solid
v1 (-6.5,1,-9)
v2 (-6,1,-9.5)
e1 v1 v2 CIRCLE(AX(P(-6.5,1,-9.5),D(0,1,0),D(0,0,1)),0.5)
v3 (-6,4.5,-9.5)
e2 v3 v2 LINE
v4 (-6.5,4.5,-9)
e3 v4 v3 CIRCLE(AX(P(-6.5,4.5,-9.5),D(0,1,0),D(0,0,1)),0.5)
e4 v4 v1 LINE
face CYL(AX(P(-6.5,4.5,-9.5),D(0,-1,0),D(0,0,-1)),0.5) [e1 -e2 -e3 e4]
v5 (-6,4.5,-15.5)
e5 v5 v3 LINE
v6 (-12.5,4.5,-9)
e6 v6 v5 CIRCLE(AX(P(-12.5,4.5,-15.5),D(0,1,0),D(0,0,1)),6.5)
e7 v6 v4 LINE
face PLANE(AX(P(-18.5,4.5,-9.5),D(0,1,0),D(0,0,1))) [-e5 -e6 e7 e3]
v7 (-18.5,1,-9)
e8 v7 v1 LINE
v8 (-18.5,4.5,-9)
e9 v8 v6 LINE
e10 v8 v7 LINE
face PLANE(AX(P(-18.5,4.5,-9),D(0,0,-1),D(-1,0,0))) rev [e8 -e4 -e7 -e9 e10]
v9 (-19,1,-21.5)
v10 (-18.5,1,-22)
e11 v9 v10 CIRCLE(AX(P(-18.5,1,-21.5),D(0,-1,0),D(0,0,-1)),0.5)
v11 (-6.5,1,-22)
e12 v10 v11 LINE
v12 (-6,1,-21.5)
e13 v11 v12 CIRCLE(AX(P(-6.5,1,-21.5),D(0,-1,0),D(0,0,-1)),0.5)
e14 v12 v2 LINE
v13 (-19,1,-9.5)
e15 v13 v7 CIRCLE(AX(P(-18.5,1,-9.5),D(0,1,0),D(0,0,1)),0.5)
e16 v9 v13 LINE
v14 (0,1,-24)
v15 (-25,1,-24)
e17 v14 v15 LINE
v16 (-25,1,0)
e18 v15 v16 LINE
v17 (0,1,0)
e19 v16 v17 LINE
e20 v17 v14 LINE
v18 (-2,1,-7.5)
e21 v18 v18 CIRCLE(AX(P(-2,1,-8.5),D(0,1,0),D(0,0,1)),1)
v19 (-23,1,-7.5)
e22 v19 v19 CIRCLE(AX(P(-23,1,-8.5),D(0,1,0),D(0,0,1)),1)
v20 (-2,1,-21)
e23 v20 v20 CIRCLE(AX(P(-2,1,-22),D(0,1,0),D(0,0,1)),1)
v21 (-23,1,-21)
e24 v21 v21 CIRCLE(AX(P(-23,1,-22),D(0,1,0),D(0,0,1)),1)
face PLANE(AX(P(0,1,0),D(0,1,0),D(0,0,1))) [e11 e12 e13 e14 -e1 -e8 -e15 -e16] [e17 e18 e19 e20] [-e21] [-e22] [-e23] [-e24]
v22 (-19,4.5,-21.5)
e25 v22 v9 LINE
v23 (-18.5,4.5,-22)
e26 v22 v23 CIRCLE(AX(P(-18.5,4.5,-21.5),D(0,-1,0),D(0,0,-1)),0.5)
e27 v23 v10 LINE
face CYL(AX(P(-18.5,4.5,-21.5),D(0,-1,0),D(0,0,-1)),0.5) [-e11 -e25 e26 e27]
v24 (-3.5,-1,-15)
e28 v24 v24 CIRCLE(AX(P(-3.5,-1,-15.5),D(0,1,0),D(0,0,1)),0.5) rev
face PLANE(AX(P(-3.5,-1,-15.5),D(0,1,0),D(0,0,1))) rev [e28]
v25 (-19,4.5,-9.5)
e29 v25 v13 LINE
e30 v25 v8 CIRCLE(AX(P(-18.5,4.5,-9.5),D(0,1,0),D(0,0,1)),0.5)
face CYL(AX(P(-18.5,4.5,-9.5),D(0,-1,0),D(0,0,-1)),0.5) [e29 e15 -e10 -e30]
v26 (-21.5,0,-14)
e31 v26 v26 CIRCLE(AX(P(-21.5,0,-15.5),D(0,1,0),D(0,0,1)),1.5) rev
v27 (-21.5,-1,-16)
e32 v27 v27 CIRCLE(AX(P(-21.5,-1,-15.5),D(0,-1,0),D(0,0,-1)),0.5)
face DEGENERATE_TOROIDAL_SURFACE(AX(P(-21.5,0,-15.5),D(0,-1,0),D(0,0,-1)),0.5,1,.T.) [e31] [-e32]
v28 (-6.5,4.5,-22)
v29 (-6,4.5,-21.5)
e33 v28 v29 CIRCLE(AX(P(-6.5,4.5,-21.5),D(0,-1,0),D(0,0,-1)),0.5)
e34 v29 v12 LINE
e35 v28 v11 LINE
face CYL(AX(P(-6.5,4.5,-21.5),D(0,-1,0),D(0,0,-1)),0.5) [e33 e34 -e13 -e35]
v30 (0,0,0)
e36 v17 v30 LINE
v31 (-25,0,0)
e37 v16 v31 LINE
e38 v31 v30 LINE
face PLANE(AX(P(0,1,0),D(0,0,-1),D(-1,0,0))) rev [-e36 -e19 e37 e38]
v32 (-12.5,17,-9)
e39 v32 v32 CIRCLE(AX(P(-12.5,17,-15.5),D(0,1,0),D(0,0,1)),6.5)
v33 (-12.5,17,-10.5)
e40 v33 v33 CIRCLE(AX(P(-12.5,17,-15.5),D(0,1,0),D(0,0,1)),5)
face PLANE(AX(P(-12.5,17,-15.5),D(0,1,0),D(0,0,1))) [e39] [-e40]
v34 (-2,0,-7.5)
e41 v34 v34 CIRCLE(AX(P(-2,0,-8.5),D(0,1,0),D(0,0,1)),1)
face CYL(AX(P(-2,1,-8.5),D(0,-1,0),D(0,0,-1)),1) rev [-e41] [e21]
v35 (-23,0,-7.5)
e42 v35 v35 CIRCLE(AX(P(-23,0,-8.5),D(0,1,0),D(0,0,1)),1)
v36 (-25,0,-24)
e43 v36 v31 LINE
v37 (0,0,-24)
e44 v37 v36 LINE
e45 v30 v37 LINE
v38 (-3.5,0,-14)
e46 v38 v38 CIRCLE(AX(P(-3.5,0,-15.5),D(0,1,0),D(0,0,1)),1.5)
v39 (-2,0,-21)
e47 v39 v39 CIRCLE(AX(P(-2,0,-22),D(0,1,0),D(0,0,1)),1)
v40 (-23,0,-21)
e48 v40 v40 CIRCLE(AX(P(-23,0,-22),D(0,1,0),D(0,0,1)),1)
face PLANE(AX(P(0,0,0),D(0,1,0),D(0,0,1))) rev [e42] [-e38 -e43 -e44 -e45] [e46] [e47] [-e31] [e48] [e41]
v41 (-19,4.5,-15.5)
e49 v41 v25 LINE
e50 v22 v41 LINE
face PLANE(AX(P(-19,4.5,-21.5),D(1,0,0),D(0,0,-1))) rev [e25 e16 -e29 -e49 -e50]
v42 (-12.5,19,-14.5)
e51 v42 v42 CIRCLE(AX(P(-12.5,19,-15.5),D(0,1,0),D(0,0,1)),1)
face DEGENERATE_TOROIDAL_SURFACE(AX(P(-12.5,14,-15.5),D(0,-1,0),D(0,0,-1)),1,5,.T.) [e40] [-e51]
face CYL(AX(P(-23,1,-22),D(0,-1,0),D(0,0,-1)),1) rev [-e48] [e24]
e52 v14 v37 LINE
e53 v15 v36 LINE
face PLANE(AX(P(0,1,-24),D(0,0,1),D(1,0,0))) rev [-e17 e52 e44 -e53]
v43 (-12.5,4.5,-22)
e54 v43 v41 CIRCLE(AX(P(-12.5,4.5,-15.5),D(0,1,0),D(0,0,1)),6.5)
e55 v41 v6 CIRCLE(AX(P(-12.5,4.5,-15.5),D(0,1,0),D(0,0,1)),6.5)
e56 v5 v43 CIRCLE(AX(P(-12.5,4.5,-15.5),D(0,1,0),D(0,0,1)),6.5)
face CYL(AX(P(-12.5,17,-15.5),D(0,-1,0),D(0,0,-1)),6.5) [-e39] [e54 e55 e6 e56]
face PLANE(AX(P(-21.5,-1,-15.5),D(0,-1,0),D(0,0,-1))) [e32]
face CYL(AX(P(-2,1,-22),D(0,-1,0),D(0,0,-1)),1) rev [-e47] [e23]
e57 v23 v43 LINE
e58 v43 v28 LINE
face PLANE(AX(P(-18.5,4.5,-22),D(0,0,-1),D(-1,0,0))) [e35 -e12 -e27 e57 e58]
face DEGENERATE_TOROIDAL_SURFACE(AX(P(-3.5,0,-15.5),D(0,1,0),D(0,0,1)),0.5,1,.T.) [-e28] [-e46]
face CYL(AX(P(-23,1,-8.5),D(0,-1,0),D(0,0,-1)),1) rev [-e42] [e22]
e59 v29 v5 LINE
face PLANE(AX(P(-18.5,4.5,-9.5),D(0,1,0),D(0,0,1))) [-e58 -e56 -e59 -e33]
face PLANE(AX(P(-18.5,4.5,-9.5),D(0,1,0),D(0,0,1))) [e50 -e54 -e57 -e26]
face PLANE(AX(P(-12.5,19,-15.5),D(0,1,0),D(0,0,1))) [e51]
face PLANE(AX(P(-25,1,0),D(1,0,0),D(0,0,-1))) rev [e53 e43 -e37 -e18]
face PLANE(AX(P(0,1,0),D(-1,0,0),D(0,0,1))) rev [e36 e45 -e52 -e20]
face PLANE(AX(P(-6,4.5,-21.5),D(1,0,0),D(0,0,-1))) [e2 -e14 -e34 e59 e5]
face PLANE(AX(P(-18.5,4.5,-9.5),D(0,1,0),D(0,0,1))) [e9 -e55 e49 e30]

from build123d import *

# Parameters (mm, degrees)
SKETCH_1_W      = 25
SKETCH_1_H      = 24
SKETCH_1_R      = 1
EXTRUDE_1_DEPTH = 1
SKETCH_3_R      = 6.5
EXTRUDE_4_DEPTH = 16
EXTRUDE_5_DEPTH = 3.5
SKETCH_5_R      = 5
EXTRUDE_6_DEPTH = 2
FILLET_1_R      = 5
SKETCH_10_R     = 1.5
EXTRUDE_7_DEPTH = 1
FILLET_2_R      = 1


# Some blends are built 0.0001 mm under size
with BuildPart() as part:
    # Эскиз1 → Бобышка-Вытянуть1 (new body)
    with BuildSketch(Plane(origin=(0, 0, 0), x_dir=(1, 0, 0), z_dir=(0, 1, 0))):
        with Locations((-12.5, 12)):
            Rectangle(SKETCH_1_W, SKETCH_1_H)
        with Locations(Location((-23, 22, 0), (0, 0, 270))):
            Circle(SKETCH_1_R, mode=Mode.SUBTRACT)
        with Locations(Location((-2, 22, 0), (0, 0, 270))):
            Circle(SKETCH_1_R, mode=Mode.SUBTRACT)
        with Locations(Location((-23, 8.5, 0), (0, 0, 270))):
            Circle(SKETCH_1_R, mode=Mode.SUBTRACT)
        with Locations(Location((-2, 8.5, 0), (0, 0, 270))):
            Circle(SKETCH_1_R, mode=Mode.SUBTRACT)
    extrude(amount=EXTRUDE_1_DEPTH)

    # Эскиз3 → Бобышка-Вытянуть4 (add)
    with BuildSketch(Plane(origin=(0, 1, 0), x_dir=(1, 0, 0), z_dir=(0, 1, 0))):
        with Locations(Location((-12.5, 15.5, 0), (0, 0, 270))):
            Circle(SKETCH_3_R)
    extrude(amount=EXTRUDE_4_DEPTH)

    # Эскиз3<5> → Бобышка-Вытянуть5 (add)
    with BuildSketch(Plane(origin=(0, 1, 0), x_dir=(1, 0, 0), z_dir=(0, 1, 0))):
        with BuildLine():
            Line((-19, 21.5), (-19, 9.5))
            ThreePointArc((-19, 9.5), (-18.853553391, 9.146446609), (-18.5, 9))
            Line((-18.5, 9), (-6.5, 9))
            ThreePointArc((-6.5, 9), (-6.146446609, 9.146446609), (-6, 9.5))
            Line((-6, 9.5), (-6, 21.5))
            ThreePointArc((-6, 21.5), (-6.146446609, 21.853553391), (-6.5, 22))
            Line((-6.5, 22), (-18.5, 22))
            ThreePointArc((-18.5, 22), (-18.853553391, 21.853553391), (-19, 21.5))
        make_face()
    extrude(amount=EXTRUDE_5_DEPTH)

    # Эскиз5 → Бобышка-Вытянуть6 (add)
    with BuildSketch(Plane(origin=(0, 17, 0), x_dir=(1, 0, 0), z_dir=(0, 1, 0))):
        with Locations(Location((-12.5, 15.5, 0), (0, 0, 270))):
            Circle(SKETCH_5_R)
    extrude(amount=EXTRUDE_6_DEPTH)

    # Скругление1
    # the kernel refuses this fillet: 5 mm, written as the material it takes off along each edge
    with BuildSketch(Plane(origin=(-12.5, 19, -15.5), x_dir=(0, 0, 1), z_dir=(-1, 0, 0))) as fillet_1_piece_1:
        with BuildLine():
            CenterArc((1, -5), FILLET_1_R, 36.869897646, 53.130102354)
            Line((1, 0), (1, 0.1))
            Line((1, 0.1), (5, 0.1))
            Line((5, 0.1), (5.1, 0))
            ThreePointArc((5.1, 0), (5.1, -1), (5.08, -1.94))
            Line((5.08, -1.94), (5, -2))
        make_face()
    revolve(axis=Axis((-12.5, 19, -15.5), (0, 1, 0)), mode=Mode.SUBTRACT)

    # Эскиз10 → Бобышка-Вытянуть7 (add)
    with BuildSketch(Plane.XZ):
        with Locations(Location((-21.5, -15.5, 0), (0, 0, 90))):
            Circle(SKETCH_10_R)
        with Locations(Location((-3.5, -15.5, 0), (0, 0, 90))):
            Circle(SKETCH_10_R)
    extrude(amount=EXTRUDE_7_DEPTH)

    # Скругление2
    fillet_2_edges = [part.edges().sort_by_distance(p)[0] for p in [
        (-21.5, -1, -17),
        (-3.5, -1, -17),
    ]]
    fillet(fillet_2_edges, radius=FILLET_2_R - 0.0001)  # a hair under: the kernel refuses the full size


solid = part.part
